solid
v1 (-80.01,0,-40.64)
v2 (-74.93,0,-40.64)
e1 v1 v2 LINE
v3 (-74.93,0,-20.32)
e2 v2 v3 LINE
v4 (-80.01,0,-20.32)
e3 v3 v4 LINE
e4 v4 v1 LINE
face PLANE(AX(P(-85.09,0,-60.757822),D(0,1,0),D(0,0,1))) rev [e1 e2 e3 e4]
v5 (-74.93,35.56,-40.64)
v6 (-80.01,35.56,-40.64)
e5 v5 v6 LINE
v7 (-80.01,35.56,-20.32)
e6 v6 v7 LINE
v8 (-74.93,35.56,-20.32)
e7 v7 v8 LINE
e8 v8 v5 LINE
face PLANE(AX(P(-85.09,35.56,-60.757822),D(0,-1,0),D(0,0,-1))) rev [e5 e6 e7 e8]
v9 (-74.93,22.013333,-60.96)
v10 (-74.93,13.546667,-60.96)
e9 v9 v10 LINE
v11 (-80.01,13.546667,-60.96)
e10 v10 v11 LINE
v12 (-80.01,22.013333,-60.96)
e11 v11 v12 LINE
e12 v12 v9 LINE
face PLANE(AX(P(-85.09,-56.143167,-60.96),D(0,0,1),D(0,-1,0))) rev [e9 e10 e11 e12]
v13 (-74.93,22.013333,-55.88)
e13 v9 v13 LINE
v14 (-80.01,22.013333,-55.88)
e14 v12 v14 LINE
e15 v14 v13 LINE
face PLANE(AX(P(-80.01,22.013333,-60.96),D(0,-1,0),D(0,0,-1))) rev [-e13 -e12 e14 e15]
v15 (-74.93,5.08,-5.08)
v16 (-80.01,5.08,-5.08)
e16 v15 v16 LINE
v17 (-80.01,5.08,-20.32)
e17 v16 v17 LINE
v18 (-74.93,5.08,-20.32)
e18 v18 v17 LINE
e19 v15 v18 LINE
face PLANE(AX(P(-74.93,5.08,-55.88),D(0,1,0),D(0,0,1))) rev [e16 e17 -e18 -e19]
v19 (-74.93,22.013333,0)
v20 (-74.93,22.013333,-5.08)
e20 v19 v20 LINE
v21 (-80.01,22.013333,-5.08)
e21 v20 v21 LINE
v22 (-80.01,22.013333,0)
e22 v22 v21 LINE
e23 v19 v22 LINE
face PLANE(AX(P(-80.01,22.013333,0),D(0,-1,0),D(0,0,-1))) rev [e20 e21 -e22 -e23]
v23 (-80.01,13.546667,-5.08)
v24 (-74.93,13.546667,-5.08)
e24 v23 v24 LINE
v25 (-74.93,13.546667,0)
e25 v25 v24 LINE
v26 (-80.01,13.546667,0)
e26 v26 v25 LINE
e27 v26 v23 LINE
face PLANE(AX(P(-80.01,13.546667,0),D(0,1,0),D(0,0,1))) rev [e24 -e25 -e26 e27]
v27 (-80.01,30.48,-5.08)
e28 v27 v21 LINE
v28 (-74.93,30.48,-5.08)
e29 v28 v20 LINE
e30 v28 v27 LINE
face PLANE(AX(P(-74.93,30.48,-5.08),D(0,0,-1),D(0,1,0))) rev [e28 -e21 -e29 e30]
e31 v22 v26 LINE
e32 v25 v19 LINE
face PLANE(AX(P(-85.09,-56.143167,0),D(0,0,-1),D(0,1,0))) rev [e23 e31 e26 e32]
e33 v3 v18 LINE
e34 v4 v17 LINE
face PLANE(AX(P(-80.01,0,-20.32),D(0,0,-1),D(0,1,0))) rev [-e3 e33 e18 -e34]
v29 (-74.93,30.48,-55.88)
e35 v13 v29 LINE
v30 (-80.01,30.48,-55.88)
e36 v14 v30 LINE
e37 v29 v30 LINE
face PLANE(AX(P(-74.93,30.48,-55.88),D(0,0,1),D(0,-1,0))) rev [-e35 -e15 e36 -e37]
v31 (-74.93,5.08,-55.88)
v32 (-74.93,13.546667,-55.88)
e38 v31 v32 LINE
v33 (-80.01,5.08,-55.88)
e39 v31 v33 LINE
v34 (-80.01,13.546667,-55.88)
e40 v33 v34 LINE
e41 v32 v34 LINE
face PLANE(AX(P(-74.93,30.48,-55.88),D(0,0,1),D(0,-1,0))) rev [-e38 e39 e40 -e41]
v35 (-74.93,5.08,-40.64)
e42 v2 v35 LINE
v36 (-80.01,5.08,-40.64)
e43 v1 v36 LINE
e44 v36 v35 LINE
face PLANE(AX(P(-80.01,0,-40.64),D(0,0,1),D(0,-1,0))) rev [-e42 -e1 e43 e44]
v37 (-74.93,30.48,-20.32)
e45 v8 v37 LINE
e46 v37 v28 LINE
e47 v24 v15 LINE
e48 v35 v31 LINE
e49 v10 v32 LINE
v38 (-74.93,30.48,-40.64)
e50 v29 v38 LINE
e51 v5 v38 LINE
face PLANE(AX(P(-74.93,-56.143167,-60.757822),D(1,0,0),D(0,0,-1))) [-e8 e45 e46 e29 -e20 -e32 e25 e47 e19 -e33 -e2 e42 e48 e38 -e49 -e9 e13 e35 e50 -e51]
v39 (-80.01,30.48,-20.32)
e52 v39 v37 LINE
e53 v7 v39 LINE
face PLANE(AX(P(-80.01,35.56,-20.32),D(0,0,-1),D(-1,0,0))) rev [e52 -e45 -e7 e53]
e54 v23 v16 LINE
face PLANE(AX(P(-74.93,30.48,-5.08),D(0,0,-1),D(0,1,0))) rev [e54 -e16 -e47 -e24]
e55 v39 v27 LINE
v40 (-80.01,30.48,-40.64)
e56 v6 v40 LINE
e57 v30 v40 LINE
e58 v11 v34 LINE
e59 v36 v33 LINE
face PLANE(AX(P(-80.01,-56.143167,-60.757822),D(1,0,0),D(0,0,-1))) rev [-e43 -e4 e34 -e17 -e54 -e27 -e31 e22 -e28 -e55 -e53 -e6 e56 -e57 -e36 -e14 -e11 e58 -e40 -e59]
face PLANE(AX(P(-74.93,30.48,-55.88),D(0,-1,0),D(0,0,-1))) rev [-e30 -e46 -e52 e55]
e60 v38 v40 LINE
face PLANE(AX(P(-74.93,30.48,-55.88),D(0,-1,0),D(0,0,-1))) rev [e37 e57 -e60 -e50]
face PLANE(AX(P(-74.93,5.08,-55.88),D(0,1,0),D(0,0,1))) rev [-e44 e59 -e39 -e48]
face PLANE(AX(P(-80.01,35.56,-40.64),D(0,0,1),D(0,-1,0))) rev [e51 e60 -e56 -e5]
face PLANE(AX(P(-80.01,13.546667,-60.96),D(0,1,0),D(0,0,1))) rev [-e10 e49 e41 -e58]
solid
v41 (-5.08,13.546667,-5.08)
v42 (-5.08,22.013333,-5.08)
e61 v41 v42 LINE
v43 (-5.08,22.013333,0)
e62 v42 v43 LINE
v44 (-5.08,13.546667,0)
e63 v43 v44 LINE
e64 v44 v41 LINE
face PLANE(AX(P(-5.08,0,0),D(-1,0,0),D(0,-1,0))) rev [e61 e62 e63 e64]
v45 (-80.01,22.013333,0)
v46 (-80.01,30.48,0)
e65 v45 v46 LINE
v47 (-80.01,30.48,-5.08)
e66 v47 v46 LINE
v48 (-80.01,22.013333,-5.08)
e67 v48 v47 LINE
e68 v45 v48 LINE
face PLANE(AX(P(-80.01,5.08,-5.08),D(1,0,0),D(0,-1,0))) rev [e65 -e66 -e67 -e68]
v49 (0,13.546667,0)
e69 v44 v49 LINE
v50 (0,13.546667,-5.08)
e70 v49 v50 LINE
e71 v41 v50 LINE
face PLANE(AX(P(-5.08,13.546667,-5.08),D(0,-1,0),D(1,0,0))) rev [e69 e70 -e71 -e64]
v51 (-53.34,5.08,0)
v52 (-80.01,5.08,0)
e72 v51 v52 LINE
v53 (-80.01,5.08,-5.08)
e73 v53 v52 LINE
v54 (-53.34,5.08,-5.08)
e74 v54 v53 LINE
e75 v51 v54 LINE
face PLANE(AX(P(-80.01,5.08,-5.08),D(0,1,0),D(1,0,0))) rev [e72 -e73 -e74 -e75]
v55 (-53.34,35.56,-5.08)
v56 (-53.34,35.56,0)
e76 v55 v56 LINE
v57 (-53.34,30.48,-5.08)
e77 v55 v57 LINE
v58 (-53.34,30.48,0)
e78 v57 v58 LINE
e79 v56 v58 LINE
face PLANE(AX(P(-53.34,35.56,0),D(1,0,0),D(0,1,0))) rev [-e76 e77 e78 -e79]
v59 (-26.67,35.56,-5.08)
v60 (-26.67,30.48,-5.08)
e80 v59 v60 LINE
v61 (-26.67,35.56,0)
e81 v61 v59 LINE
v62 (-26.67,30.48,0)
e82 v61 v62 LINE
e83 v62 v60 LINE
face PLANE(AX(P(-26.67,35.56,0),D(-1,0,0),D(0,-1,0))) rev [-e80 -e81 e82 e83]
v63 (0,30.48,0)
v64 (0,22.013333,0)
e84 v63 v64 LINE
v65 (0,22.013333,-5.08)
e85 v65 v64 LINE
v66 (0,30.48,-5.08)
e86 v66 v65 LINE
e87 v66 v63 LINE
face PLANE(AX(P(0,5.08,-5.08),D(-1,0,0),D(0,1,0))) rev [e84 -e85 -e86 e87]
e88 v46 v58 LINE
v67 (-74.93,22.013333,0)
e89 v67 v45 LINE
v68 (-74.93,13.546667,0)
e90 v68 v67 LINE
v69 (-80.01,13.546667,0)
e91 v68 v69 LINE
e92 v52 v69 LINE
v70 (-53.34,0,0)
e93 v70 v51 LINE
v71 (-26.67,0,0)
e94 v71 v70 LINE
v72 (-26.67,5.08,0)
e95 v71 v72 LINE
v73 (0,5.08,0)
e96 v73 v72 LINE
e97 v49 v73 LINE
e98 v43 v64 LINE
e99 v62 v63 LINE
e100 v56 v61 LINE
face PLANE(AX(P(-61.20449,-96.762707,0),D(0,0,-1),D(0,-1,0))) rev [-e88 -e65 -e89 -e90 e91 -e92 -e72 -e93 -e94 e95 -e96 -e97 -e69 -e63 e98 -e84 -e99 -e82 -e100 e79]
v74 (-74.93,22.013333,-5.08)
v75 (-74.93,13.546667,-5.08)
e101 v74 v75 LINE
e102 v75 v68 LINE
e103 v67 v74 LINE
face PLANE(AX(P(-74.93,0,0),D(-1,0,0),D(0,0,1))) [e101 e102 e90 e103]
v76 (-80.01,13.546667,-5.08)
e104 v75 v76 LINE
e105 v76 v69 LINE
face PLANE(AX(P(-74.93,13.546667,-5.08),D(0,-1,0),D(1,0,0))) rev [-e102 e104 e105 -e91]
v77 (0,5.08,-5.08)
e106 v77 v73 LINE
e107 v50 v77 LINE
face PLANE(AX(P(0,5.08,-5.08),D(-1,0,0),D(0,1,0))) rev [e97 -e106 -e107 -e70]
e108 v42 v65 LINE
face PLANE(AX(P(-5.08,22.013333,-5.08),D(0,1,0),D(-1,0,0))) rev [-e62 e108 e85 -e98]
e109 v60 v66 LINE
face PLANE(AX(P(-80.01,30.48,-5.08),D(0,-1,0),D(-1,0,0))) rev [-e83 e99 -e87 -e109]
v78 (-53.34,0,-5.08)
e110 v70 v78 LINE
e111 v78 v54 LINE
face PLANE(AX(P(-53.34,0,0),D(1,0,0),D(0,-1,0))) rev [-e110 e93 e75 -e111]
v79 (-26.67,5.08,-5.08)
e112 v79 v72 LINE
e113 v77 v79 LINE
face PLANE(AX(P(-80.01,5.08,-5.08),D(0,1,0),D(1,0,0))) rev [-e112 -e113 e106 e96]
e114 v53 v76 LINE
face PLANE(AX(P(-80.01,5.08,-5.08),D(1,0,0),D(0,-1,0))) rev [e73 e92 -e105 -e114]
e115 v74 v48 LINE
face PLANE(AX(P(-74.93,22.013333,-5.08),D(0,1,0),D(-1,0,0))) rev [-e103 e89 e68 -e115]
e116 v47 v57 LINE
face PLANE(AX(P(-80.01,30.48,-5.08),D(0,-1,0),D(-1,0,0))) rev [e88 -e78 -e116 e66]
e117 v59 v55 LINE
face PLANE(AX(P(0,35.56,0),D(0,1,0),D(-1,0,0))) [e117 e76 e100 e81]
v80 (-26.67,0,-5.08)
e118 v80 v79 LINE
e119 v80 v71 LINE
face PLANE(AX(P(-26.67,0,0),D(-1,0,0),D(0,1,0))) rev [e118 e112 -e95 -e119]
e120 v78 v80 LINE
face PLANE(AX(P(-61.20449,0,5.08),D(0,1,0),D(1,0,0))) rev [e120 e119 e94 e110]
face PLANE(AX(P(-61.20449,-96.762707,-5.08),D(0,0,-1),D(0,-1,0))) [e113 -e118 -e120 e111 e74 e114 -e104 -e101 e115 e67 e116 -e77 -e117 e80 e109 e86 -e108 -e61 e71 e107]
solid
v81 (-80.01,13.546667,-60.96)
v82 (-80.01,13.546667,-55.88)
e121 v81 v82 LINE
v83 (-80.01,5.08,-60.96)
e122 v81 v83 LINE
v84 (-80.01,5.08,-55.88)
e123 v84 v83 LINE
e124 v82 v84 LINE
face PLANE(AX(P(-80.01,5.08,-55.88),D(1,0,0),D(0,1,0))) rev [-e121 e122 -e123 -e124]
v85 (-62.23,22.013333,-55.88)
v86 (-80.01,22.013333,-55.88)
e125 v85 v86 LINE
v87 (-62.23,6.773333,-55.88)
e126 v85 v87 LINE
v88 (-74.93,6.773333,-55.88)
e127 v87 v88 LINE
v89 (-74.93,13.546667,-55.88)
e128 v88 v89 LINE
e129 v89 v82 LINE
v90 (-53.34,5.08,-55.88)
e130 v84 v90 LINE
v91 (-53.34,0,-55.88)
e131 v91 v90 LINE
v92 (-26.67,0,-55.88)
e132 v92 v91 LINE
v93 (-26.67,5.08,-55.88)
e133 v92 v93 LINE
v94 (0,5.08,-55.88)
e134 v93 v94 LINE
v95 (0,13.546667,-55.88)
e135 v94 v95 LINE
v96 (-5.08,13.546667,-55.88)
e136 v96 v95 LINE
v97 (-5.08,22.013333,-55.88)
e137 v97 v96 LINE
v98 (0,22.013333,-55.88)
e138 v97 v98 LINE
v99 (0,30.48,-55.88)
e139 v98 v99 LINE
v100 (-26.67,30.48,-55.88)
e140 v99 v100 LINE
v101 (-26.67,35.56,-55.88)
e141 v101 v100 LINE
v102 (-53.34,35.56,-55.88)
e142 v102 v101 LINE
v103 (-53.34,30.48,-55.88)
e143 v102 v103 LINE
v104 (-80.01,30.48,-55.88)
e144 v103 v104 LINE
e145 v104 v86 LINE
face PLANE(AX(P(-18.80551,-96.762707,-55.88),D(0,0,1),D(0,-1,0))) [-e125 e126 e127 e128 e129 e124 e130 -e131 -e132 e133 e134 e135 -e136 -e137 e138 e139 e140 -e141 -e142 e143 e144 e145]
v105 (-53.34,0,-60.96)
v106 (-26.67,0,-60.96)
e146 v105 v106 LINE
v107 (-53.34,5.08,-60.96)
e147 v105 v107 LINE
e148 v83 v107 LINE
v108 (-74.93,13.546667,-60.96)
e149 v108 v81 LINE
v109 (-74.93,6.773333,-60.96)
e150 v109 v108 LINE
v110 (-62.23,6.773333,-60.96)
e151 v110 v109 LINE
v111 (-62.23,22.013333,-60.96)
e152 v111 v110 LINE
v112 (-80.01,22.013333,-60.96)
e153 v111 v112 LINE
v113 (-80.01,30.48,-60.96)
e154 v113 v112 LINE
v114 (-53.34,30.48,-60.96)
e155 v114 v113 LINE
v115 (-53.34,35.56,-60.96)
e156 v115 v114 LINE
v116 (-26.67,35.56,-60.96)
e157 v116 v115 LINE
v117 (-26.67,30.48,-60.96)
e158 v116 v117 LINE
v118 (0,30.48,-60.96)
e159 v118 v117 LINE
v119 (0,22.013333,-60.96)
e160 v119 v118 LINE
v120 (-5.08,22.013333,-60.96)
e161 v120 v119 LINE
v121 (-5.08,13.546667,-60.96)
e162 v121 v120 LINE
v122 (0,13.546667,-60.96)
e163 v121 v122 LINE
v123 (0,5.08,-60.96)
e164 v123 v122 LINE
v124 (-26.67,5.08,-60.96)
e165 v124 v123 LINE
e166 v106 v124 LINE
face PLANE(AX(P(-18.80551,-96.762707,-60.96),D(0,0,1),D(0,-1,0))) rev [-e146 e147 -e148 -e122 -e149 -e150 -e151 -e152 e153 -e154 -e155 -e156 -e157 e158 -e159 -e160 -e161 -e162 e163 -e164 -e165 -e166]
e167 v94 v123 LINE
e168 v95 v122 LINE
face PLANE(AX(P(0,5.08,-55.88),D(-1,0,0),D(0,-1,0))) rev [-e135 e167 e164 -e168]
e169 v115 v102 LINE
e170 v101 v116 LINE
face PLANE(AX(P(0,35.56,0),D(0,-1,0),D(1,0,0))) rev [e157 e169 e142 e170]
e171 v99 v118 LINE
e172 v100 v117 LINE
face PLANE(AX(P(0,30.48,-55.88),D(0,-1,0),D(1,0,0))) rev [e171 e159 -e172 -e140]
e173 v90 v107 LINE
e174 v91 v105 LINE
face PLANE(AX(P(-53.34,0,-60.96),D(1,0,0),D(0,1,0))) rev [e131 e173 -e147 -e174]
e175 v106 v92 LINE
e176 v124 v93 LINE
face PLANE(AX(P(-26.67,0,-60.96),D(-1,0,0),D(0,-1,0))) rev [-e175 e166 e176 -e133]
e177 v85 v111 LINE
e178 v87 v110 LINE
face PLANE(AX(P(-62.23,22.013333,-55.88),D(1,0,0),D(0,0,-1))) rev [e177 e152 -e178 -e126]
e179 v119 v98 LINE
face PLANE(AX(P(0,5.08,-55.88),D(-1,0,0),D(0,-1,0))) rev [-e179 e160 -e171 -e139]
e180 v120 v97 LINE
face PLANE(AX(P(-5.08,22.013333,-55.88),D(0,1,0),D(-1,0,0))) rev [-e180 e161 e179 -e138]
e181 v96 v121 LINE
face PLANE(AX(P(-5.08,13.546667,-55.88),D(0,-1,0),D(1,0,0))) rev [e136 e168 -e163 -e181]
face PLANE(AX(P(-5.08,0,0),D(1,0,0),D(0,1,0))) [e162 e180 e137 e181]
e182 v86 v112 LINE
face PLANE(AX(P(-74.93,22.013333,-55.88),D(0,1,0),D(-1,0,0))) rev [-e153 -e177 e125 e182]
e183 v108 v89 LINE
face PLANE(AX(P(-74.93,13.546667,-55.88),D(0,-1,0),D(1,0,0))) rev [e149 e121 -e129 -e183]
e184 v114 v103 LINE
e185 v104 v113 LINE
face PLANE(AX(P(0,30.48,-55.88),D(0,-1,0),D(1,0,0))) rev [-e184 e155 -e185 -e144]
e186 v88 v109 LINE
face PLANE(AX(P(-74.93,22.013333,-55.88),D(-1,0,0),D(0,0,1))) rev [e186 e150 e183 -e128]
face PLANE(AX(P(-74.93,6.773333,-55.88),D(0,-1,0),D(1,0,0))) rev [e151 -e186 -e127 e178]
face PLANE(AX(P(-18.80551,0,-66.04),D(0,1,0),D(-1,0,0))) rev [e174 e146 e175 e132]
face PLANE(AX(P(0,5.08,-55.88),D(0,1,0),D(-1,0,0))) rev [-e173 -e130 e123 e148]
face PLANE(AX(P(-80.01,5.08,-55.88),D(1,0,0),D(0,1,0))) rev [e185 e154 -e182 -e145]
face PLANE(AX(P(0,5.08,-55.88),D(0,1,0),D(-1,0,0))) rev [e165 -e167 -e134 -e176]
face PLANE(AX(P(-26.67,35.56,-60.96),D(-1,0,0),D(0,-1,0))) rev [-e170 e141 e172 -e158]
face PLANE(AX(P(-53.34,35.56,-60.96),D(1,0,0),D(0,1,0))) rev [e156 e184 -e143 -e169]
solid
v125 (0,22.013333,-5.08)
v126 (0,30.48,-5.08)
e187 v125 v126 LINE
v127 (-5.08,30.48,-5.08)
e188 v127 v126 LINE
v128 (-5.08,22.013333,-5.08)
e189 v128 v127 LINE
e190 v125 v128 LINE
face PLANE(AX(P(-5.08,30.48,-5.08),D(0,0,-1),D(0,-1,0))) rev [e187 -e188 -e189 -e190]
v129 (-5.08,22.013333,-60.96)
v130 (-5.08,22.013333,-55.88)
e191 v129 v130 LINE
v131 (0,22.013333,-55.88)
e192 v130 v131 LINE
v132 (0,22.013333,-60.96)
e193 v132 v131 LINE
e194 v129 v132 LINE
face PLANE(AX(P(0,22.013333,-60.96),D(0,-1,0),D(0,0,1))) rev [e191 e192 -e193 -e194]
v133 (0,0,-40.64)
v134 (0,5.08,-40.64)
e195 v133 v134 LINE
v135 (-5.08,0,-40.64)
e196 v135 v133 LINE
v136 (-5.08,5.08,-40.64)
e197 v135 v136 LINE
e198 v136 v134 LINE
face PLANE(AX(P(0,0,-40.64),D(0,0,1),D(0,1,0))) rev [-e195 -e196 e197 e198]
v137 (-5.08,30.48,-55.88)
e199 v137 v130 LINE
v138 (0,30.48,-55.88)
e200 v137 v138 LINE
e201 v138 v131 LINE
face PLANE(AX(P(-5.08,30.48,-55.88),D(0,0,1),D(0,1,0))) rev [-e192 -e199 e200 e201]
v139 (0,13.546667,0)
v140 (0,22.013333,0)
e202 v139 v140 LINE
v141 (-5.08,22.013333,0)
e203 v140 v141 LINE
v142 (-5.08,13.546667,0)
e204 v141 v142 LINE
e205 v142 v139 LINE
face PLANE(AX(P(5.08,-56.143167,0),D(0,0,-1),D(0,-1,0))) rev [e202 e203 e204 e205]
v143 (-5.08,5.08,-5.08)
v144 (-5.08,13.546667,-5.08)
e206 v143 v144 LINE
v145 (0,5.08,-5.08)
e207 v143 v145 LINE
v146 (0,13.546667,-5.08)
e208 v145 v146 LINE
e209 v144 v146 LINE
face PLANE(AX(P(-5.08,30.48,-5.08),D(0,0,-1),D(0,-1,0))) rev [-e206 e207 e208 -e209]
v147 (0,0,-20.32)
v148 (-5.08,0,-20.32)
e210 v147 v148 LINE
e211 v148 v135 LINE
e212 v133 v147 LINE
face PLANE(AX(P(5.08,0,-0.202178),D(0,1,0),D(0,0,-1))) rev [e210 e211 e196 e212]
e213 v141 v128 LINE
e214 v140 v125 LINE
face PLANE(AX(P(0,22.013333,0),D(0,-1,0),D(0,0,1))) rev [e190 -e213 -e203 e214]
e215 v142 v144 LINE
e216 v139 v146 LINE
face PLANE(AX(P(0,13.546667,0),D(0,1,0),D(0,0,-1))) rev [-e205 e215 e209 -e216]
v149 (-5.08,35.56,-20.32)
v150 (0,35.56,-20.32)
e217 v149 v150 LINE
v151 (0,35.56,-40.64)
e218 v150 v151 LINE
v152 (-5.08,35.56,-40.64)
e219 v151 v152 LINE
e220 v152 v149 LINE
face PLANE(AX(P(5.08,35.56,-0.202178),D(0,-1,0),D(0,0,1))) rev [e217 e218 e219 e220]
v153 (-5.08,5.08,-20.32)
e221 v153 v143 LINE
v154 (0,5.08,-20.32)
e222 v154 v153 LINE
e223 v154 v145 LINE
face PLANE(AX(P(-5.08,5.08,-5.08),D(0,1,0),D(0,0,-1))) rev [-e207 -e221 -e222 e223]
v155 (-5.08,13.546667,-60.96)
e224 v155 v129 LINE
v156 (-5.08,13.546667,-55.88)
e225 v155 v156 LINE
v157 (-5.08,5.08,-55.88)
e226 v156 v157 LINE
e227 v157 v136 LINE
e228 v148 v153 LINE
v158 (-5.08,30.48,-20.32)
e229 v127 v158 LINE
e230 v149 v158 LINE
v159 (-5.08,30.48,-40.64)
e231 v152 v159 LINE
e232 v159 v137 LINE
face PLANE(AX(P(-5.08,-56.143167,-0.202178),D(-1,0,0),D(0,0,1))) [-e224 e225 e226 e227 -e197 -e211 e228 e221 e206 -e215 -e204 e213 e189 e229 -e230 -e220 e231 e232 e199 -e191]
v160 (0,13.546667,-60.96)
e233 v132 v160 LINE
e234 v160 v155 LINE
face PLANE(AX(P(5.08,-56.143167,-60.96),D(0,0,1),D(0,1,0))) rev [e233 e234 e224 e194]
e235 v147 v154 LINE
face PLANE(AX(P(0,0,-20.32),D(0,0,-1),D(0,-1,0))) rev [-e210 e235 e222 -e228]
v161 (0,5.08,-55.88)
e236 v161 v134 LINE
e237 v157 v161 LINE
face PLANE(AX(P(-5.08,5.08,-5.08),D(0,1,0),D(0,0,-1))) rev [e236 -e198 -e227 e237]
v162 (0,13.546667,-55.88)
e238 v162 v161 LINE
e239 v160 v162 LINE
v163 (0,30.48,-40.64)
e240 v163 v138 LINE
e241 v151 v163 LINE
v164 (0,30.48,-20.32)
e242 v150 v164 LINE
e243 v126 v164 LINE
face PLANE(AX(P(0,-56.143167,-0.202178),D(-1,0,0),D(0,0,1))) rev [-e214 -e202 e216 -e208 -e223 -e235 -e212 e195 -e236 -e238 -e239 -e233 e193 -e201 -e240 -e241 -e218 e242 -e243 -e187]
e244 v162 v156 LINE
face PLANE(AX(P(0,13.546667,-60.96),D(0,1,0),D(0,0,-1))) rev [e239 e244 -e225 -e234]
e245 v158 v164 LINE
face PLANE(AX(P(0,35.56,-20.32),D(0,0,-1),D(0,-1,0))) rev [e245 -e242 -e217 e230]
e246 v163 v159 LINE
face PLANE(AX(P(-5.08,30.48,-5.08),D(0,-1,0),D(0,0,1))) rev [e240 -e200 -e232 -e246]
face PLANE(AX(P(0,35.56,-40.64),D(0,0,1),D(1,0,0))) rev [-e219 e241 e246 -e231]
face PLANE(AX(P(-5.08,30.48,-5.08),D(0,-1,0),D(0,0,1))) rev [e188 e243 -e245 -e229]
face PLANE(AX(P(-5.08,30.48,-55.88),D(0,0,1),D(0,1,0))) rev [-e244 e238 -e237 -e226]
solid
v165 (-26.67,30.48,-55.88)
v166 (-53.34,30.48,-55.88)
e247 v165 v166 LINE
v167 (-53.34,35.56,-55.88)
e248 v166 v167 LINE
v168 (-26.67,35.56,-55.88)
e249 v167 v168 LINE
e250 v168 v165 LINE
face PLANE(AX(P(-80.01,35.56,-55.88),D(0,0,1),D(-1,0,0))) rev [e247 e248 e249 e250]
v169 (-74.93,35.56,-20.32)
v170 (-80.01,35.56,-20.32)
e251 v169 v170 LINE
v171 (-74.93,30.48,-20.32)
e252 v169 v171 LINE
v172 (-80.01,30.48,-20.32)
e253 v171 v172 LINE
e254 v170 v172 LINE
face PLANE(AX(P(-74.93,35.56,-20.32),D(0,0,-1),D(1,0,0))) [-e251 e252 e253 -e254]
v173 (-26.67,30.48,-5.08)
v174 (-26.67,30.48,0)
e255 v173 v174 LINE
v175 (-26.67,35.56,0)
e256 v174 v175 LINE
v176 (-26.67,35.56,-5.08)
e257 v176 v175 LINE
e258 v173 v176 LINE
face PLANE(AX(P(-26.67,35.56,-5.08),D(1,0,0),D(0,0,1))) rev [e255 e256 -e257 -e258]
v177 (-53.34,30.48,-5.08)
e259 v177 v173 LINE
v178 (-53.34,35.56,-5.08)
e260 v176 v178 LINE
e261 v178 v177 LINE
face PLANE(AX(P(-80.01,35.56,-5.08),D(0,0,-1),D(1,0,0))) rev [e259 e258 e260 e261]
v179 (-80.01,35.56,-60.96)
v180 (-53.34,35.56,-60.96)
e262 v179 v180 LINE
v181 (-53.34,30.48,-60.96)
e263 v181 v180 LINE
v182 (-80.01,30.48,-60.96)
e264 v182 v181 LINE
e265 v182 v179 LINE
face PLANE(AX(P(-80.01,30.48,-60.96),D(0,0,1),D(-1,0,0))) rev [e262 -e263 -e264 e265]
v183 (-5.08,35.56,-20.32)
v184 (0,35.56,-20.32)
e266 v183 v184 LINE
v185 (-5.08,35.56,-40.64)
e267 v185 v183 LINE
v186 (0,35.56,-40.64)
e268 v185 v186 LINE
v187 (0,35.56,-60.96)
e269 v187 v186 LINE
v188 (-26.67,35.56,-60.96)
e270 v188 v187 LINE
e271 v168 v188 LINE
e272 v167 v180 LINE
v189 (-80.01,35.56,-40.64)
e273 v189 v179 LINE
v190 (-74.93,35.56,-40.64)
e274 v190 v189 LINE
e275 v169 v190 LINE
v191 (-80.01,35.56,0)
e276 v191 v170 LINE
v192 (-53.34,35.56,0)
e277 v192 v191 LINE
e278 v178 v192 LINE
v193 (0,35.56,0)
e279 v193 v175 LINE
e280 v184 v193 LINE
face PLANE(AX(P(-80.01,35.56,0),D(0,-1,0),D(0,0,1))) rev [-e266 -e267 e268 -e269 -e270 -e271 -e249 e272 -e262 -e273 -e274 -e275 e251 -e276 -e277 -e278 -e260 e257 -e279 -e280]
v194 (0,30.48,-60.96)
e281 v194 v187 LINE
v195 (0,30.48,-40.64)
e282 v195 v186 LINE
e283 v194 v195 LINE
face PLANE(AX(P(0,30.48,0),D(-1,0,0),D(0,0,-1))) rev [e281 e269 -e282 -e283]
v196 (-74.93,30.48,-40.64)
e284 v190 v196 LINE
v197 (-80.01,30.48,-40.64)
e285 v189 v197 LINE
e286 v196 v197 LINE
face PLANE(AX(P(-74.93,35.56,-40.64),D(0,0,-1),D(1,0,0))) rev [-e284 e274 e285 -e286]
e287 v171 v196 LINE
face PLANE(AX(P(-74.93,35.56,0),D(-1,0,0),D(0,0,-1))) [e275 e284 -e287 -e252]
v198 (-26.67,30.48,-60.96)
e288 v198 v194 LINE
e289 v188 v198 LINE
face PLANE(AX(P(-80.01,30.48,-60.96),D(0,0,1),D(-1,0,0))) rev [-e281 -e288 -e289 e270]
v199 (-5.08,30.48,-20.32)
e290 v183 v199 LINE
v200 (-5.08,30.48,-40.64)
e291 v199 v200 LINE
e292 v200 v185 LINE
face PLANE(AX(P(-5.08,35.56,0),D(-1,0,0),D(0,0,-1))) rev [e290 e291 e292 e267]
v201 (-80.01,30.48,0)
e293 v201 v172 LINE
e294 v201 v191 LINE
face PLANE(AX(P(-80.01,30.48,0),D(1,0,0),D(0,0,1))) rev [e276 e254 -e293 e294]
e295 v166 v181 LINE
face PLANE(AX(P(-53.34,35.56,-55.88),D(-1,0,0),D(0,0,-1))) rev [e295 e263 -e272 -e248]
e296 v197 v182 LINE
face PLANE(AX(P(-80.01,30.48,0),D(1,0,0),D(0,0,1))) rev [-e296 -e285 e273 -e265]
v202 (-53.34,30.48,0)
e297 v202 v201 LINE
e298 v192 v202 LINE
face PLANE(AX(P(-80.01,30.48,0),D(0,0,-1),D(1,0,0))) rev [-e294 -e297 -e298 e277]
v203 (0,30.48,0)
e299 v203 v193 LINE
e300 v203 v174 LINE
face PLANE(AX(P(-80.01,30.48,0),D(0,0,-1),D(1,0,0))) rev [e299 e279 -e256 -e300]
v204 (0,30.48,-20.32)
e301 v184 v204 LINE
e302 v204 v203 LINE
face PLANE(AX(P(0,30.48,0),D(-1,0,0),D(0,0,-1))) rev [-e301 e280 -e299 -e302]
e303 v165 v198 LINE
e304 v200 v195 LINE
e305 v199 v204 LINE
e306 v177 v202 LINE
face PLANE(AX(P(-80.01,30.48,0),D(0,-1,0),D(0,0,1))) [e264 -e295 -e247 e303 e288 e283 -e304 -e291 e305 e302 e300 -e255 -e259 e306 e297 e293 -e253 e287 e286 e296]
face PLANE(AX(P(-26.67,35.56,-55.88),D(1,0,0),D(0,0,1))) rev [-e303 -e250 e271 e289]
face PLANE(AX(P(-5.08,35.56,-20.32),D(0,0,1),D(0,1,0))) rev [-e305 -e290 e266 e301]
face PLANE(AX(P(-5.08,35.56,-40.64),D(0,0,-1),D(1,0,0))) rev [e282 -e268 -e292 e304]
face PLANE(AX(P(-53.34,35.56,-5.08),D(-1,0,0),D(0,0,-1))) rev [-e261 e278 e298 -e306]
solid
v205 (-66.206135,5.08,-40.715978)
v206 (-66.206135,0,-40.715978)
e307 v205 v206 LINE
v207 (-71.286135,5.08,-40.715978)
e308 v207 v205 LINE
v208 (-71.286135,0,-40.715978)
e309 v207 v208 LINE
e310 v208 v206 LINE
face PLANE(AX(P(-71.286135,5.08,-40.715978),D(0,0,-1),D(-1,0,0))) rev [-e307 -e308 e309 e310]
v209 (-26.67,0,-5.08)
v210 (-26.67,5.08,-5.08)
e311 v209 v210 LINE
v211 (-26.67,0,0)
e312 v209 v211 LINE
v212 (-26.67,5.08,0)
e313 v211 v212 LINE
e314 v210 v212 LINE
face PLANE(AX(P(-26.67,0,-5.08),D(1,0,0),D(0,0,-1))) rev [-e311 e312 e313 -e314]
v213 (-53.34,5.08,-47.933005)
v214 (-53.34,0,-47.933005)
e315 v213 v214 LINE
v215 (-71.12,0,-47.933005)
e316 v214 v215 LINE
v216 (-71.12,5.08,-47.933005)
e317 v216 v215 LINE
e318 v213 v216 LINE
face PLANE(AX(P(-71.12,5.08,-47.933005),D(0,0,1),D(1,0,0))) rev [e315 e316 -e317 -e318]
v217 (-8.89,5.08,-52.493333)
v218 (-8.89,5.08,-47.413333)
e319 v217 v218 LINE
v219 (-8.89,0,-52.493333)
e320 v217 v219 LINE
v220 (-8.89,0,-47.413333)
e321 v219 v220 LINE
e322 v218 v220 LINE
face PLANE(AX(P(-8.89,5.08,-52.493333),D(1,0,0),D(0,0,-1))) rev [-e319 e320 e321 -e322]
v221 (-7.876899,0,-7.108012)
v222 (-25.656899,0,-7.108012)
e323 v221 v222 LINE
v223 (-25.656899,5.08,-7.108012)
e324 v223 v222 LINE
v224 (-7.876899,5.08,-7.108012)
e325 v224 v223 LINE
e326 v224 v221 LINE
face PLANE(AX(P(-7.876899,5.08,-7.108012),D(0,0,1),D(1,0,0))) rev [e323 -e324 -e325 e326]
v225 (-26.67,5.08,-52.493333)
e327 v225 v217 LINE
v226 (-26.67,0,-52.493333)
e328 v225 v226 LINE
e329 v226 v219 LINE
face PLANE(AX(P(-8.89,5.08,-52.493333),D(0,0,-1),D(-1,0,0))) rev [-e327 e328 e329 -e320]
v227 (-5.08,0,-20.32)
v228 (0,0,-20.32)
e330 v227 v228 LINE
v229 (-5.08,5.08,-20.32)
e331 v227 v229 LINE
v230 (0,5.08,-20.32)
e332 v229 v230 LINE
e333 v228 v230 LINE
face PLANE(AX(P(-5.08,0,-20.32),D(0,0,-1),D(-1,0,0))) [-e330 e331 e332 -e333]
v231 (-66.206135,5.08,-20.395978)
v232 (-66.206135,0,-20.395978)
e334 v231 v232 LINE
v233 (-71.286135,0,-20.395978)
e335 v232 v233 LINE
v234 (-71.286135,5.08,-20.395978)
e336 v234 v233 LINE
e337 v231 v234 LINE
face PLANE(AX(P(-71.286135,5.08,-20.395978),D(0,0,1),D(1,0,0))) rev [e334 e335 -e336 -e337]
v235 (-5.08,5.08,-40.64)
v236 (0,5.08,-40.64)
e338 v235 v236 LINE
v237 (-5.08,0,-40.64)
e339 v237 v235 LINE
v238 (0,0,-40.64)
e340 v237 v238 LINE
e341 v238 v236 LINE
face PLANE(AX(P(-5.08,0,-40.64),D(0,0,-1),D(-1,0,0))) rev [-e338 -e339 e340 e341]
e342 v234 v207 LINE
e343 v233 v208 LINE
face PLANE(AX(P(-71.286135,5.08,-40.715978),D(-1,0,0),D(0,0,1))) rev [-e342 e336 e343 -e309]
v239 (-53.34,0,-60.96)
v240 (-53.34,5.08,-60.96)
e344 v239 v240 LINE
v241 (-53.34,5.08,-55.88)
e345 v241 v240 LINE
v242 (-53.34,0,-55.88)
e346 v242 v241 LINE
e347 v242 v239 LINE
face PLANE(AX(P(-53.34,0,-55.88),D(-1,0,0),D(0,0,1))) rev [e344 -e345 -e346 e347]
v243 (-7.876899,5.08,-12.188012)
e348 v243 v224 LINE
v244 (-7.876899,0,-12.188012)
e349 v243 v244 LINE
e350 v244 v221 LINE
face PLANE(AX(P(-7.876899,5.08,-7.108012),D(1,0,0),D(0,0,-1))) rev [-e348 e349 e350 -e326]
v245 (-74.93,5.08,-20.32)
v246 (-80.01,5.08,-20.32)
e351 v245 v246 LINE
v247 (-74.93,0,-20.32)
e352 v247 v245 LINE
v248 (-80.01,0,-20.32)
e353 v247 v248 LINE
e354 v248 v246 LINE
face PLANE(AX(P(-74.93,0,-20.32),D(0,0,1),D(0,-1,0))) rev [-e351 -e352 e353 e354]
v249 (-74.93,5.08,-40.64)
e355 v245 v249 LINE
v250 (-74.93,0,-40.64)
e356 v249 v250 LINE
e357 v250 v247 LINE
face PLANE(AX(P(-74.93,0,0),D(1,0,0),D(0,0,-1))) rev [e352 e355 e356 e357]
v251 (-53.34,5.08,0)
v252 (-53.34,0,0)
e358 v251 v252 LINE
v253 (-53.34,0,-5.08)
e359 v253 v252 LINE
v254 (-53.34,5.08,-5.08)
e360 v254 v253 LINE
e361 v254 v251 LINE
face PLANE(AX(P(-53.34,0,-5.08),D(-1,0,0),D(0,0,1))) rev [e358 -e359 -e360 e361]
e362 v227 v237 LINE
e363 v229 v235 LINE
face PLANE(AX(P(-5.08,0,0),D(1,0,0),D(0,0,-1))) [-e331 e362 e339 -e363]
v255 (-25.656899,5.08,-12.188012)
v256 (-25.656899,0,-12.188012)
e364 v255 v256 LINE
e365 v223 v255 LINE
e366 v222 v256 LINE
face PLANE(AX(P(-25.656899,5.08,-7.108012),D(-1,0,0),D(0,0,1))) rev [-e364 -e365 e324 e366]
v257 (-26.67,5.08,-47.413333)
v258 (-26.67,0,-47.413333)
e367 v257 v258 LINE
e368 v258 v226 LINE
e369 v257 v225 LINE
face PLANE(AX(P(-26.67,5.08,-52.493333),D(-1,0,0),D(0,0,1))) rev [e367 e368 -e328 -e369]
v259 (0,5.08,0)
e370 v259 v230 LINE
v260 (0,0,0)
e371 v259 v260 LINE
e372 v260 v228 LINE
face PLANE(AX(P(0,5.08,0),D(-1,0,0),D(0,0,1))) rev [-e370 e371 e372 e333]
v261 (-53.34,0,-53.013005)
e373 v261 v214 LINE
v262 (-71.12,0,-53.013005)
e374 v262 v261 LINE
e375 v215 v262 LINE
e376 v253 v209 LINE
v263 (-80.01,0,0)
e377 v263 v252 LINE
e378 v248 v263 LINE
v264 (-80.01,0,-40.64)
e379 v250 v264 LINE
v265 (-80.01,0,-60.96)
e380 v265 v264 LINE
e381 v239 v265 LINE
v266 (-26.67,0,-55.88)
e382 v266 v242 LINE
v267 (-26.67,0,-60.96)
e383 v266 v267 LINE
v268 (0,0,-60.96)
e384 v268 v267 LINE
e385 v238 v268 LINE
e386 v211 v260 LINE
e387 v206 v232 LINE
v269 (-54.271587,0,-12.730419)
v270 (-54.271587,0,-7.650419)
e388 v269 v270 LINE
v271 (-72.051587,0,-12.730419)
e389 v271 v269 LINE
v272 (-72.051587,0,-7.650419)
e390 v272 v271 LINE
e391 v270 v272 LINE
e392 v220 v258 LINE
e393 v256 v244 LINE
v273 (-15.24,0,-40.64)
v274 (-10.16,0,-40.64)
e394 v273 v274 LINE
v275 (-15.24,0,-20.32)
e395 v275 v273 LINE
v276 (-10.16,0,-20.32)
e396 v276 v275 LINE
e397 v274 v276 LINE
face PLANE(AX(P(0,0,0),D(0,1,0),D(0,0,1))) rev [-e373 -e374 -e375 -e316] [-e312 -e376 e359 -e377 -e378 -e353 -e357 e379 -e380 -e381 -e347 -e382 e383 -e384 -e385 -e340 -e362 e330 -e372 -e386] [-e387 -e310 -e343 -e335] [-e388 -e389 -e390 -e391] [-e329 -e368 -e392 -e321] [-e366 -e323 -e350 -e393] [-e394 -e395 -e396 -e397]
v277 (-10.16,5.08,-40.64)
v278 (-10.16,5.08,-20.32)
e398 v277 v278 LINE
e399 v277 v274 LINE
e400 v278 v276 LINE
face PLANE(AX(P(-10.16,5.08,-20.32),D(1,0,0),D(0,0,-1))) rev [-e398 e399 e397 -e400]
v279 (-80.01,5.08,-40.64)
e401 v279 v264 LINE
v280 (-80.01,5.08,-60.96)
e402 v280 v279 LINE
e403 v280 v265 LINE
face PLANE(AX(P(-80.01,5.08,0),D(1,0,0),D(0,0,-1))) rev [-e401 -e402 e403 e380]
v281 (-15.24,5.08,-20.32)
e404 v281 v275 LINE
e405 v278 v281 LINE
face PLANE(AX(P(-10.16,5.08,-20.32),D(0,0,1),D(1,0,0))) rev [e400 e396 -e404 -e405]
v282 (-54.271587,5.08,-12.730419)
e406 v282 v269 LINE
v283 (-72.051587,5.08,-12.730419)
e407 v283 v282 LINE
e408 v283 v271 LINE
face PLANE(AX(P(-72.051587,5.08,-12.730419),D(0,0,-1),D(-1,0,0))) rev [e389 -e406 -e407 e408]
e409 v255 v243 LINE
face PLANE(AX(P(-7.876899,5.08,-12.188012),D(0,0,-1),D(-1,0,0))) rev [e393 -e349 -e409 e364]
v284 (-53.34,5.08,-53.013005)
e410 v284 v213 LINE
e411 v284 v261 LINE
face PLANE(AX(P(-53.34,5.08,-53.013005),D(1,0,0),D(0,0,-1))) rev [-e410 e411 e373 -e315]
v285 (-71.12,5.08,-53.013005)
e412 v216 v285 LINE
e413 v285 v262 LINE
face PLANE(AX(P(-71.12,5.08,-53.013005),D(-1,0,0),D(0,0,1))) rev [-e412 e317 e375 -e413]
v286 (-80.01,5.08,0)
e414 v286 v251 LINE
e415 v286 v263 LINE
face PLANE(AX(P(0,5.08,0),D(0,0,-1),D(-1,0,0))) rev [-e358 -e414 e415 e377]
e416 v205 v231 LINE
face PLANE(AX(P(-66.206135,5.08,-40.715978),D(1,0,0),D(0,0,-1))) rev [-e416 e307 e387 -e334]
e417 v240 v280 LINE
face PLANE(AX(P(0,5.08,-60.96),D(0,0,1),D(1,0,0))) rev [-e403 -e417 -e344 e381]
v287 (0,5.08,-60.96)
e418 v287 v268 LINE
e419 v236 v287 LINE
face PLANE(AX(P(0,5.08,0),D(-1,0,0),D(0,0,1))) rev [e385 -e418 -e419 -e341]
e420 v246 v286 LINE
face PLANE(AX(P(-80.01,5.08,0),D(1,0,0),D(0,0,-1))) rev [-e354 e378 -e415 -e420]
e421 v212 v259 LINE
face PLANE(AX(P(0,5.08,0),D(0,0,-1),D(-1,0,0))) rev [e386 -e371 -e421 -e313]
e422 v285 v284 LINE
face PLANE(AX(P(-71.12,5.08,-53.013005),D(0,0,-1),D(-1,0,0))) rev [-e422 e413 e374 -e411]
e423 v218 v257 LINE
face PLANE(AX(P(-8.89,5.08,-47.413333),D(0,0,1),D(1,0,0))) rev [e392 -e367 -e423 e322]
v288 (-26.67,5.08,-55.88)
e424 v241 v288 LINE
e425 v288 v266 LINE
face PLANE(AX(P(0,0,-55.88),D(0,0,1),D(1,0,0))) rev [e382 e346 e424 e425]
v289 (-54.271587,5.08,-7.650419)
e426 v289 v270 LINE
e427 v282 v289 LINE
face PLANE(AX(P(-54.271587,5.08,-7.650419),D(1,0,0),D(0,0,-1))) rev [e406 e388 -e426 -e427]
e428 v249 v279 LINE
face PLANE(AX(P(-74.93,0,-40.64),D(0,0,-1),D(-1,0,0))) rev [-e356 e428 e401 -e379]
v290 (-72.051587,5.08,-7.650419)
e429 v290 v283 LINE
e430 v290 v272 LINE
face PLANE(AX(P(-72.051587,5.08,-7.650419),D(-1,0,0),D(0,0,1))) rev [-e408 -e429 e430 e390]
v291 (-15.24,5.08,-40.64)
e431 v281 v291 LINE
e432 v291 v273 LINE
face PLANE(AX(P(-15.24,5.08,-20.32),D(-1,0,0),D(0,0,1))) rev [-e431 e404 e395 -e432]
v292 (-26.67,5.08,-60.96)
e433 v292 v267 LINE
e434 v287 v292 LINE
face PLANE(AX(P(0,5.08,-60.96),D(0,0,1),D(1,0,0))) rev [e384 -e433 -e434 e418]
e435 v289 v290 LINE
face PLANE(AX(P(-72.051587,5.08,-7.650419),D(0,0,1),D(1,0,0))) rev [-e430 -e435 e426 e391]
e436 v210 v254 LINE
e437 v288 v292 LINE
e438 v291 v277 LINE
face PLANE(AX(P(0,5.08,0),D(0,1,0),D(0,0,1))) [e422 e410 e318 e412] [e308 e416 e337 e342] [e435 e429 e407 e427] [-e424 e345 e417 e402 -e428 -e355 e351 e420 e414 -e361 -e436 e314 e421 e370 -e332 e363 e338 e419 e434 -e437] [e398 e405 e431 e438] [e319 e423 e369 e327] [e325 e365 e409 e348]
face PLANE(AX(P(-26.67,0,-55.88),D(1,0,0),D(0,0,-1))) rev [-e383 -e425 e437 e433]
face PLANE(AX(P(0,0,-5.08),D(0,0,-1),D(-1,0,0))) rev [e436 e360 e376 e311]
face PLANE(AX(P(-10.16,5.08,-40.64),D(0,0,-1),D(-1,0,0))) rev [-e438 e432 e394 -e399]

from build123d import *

# Parameters (mm, degrees)
SKETCH1_W             = 80.01
SKETCH1_H             = 60.96
BOSS_EXTRUDE2_DEPTH   = 5.08
SKETCH2_W             = 20.32
SKETCH2_H             = 5.08
CUT_EXTRUDE1_DEPTH    = 5.08
SKETCH3_W             = 20.32
SKETCH3_H             = 5.08
CUT_EXTRUDE2_DEPTH    = 5.08
SKETCH4_W             = 26.67
SKETCH4_H             = 5.08
CUT_EXTRUDE3_DEPTH    = 5.08
SKETCH5_W             = 26.67
SKETCH5_H             = 5.08
CUT_EXTRUDE4_DEPTH    = 5.08
SKETCH6_W             = 80.01
SKETCH6_H             = 25.4
BOSS_EXTRUDE3_DEPTH   = 5.08
SKETCH7_W             = 26.67
SKETCH7_H             = 5.08
BOSS_EXTRUDE4_DEPTH   = 5.08
BODY_MOVE_COPY1_ANGLE = 90
CIRPATTERN1_COUNT     = 2
SKETCH8_W             = 5.08
SKETCH8_H             = 8.466666666
CUT_EXTRUDE5_DEPTH    = 5.08
SKETCH10_W            = 5.08
SKETCH10_H            = 8.466666666
CUT_EXTRUDE7_DEPTH    = 5.08
SKETCH17_W            = 12.7
SKETCH17_H            = 15.24
CUT_EXTRUDE8_DEPTH    = 5.08
SKETCH18_W            = 26.67
SKETCH18_H            = 5.08
BOSS_EXTRUDE11_DEPTH  = 5.08
CIRPATTERN4_COUNT     = 2
SKETCH19_W            = 25.4
SKETCH19_H            = 50.8
BOSS_EXTRUDE12_DEPTH  = 5.08
SKETCH20_W            = 8.466666666
SKETCH20_H            = 5.08
BOSS_EXTRUDE13_DEPTH  = 5.08
SKETCH21_W            = 8.466666666
SKETCH21_H            = 5.08
BOSS_EXTRUDE14_DEPTH  = 5.08
SKETCH22_W            = 20.32
SKETCH22_H            = 5.08
BOSS_EXTRUDE15_DEPTH  = 5.08
SKETCH23_W            = 20.32
SKETCH23_H            = 5.08
BOSS_EXTRUDE16_DEPTH  = 5.08
BODY_MOVE_COPY4_ANGLE = 90
CIRPATTERN5_ANGLE     = 180
SKETCH24_W            = 17.78
SKETCH24_H            = 5.08
CUT_EXTRUDE9_DEPTH    = 5.08
CIRPATTERN6_COUNT     = 2
SKETCH25_W            = 17.78
SKETCH25_H            = 5.08
CUT_EXTRUDE10_DEPTH   = 5.08
CIRPATTERN7_COUNT     = 2
SKETCH28_W            = 5.08
SKETCH28_H            = 20.32
CUT_EXTRUDE11_DEPTH   = 5.08
CIRPATTERN8_COUNT     = 2


with BuildPart() as part:
    # Sketch1 → Boss-Extrude2 (new body)
    with BuildSketch(Plane(origin=(0, 0, 0), x_dir=(1, 0, 0), z_dir=(0, 1, 0))):
        with Locations((-40.005, 30.48)):
            Rectangle(SKETCH1_W, SKETCH1_H)
    extrude(amount=BOSS_EXTRUDE2_DEPTH)

    # Sketch2 → Cut-Extrude1 (cut)
    with BuildSketch(Plane(origin=(0, 0, 0), x_dir=(0, 0, -1), z_dir=(1, 0, 0))):
        with Locations((30.48, 2.54)):
            Rectangle(SKETCH2_W, SKETCH2_H)
    extrude(amount=-CUT_EXTRUDE1_DEPTH, mode=Mode.SUBTRACT)

    # Sketch3 → Cut-Extrude2 (cut)
    with BuildSketch(Plane.ZY.offset(80.01)):
        with Locations((-30.48, 2.54)):
            Rectangle(SKETCH3_W, SKETCH3_H)
    extrude(amount=-CUT_EXTRUDE2_DEPTH, mode=Mode.SUBTRACT)

    # Sketch4 → Cut-Extrude3 (cut)
    with BuildSketch(Plane.XY):
        with Locations((-40.005, 2.54)):
            Rectangle(SKETCH4_W, SKETCH4_H)
    extrude(amount=-CUT_EXTRUDE3_DEPTH, mode=Mode.SUBTRACT)

    # Sketch5 → Cut-Extrude4 (cut)
    with BuildSketch(Plane(origin=(0, 0, -60.96), x_dir=(-1, 0, 0), z_dir=(0, 0, -1))):
        with Locations((40.005, 2.54)):
            Rectangle(SKETCH5_W, SKETCH5_H)
    extrude(amount=-CUT_EXTRUDE4_DEPTH, mode=Mode.SUBTRACT)


with BuildPart() as body_2:
    # Sketch6 → Boss-Extrude3 (new body)
    with BuildSketch(Plane(origin=(0, 5.08, 0), x_dir=(1, 0, 0), z_dir=(0, 1, 0))):
        with Locations((-21.199489538, 114.542707296)):
            Rectangle(SKETCH6_W, SKETCH6_H)
    extrude(amount=BOSS_EXTRUDE3_DEPTH)

    # Sketch7 → Boss-Extrude4 (add)
    with BuildSketch(Plane.XY.offset(-101.842707296)):
        with Locations((-21.199489538, 7.62)):
            Rectangle(SKETCH7_W, SKETCH7_H)
    extrude(amount=BOSS_EXTRUDE4_DEPTH)


with BuildPart() as body_2_1:
    # Body-Move/Copy1: read off the stored shape, not the designer's step
    # Body-Move/Copy1: moved
    add(body_2.part.moved(Location((-18.8055105, -66.04, 96.7627073))).rotate(Axis((0, 0, 0), (1, 0, 0)), BODY_MOVE_COPY1_ANGLE))


with BuildPart() as cirpattern1_1:
    # CirPattern1: pattern copy
    add(body_2_1.part.rotate(Axis((-40.005, 0, -30.48), (0, 1, 0)), 1 * 360 / CIRPATTERN1_COUNT))


with BuildPart() as cut_extrude5_tool:
    # Sketch8 → Cut-Extrude5 (new body)
    with BuildSketch(Plane(origin=(0, 0, 0), x_dir=(0, 0, -1), z_dir=(1, 0, 0))):
        with Locations((2.54, 17.78)):
            Rectangle(SKETCH8_W, SKETCH8_H)
        with Locations((58.42, 17.78)):
            Rectangle(SKETCH8_W, SKETCH8_H)
    extrude(amount=-CUT_EXTRUDE5_DEPTH)


with BuildPart() as body_2_2:
    add(body_2_1.part)

    # Cut-Extrude5: cut by cut_extrude5_tool
    add(cut_extrude5_tool.part, mode=Mode.SUBTRACT)


with BuildPart() as cirpattern1_1_1:
    add(cirpattern1_1.part)

    # Cut-Extrude5: cut by cut_extrude5_tool
    add(cut_extrude5_tool.part, mode=Mode.SUBTRACT)


with BuildPart() as cut_extrude7_tool:
    # Sketch10 → Cut-Extrude7 (new body)
    with BuildSketch(Plane.ZY.offset(80.01)):
        with Locations((-58.42, 17.78)):
            Rectangle(SKETCH10_W, SKETCH10_H)
        with Locations((-2.54, 17.78)):
            Rectangle(SKETCH10_W, SKETCH10_H)
    extrude(amount=-CUT_EXTRUDE7_DEPTH)


with BuildPart() as body_2_3:
    add(body_2_2.part)

    # Cut-Extrude7: cut by cut_extrude7_tool
    add(cut_extrude7_tool.part, mode=Mode.SUBTRACT)

    # Sketch17 → Cut-Extrude8 (cut)
    with BuildSketch(Plane(origin=(0, 0, -60.96), x_dir=(-1, 0, 0), z_dir=(0, 0, -1))):
        with Locations((68.58, 14.393333333)):
            Rectangle(SKETCH17_W, SKETCH17_H)
    extrude(amount=-CUT_EXTRUDE8_DEPTH, mode=Mode.SUBTRACT)



with BuildPart() as cirpattern1_1_2:
    add(cirpattern1_1_1.part)

    # Cut-Extrude7: cut by cut_extrude7_tool
    add(cut_extrude7_tool.part, mode=Mode.SUBTRACT)


with BuildPart() as body_2_4:
    add(body_2_3.part)

    add(cirpattern1_1_2.part)  # Boss-Extrude11 merges CirPattern1_1
    # Sketch18 → Boss-Extrude11 (add)
    with BuildSketch(Plane(origin=(0, 30.48, 0), x_dir=(1, 0, 0), z_dir=(0, 1, 0))):
        with Locations((-40.005, 2.54)):
            Rectangle(SKETCH18_W, SKETCH18_H)
        with Locations((-40.005, 58.42)):
            Rectangle(SKETCH18_W, SKETCH18_H)
    extrude(amount=BOSS_EXTRUDE11_DEPTH)


with BuildPart() as cirpattern4_1:
    # CirPattern4: pattern copy
    add(part.part.rotate(Axis((-40.005, 17.78, 0), (0, 0, 1)), 1 * 360 / CIRPATTERN4_COUNT))


with BuildPart() as body_4:
    # Sketch19 → Boss-Extrude12 (new body)
    with BuildSketch(Plane(origin=(0, 5.08, 0), x_dir=(1, 0, 0), z_dir=(0, 1, 0))):
        with Locations((73.923166649, 30.277821877)):
            Rectangle(SKETCH19_W, SKETCH19_H)
    extrude(amount=BOSS_EXTRUDE12_DEPTH)

    # Sketch20 → Boss-Extrude13 (add)
    with BuildSketch(Plane(origin=(0, 0, -55.677821877), x_dir=(-1, 0, 0), z_dir=(0, 0, -1))):
        with Locations((-73.923166649, 7.62)):
            Rectangle(SKETCH20_W, SKETCH20_H)
    extrude(amount=BOSS_EXTRUDE13_DEPTH)

    # Sketch21 → Boss-Extrude14 (add)
    with BuildSketch(Plane.XY.offset(-4.877821877)):
        with Locations((73.923166649, 7.62)):
            Rectangle(SKETCH21_W, SKETCH21_H)
    extrude(amount=BOSS_EXTRUDE14_DEPTH)

    # Sketch22 → Boss-Extrude15 (add)
    with BuildSketch(Plane(origin=(86.623166649, 0, 0), x_dir=(0, 0, -1), z_dir=(1, 0, 0))):
        with Locations((30.277821877, 7.62)):
            Rectangle(SKETCH22_W, SKETCH22_H)
    extrude(amount=BOSS_EXTRUDE15_DEPTH)

    # Sketch23 → Boss-Extrude16 (add)
    with BuildSketch(Plane.ZY.offset(-61.223166649)):
        with Locations((-30.277821877, 7.62)):
            Rectangle(SKETCH23_W, SKETCH23_H)
    extrude(amount=BOSS_EXTRUDE16_DEPTH)


with BuildPart() as body_4_1:
    # Body-Move/Copy4: read off the stored shape, not the designer's step
    # Body-Move/Copy4: moved
    add(body_4.part.moved(Location((-56.1431666, -5.08, -0.2021781))).rotate(Axis((0, 0, 0), (0, 0, 1)), BODY_MOVE_COPY4_ANGLE))


with BuildPart() as body_5:
    # CirPattern5: read off the stored shape, not the designer's step
    # CirPattern5: copy of body 4
    add(body_4_1.part.moved(Location((80.01, 0, 60.96))).rotate(Axis((0, 0, 0), (0, 1, 0)), CIRPATTERN5_ANGLE))


with BuildPart() as part_1:
    add(part.part)

    # Sketch24 → Cut-Extrude9 (cut)
    with BuildSketch(Plane(origin=(0, 0, 0), x_dir=(-1, 0, 0), z_dir=(0, -1, 0))):
        with Locations((17.78, 49.953333333)):
            Rectangle(SKETCH24_W, SKETCH24_H)
    cut_extrude9 = extrude(amount=-CUT_EXTRUDE9_DEPTH, mode=Mode.SUBTRACT)

    # CirPattern6: Cut-Extrude9 ×2 about axis
    cirpattern6_axis = Axis((-40.470793413, 0, -30.071876248), (0, 1, 0))
    for i in range(1, CIRPATTERN6_COUNT):
        add(cut_extrude9.rotate(cirpattern6_axis, i * 360 / CIRPATTERN6_COUNT), mode=Mode.SUBTRACT)

    # Sketch25 → Cut-Extrude10 (cut)
    with BuildSketch(Plane(origin=(0, 0, 0), x_dir=(-1, 0, 0), z_dir=(0, -1, 0))):
        with Locations((62.23, 50.473004536)):
            Rectangle(SKETCH25_W, SKETCH25_H)
    cut_extrude10 = extrude(amount=-CUT_EXTRUDE10_DEPTH, mode=Mode.SUBTRACT)

    # CirPattern7: Cut-Extrude10 ×2 about axis
    cirpattern7_axis = Axis((-39.498449663, 0, -30.06050844), (0, 1, 0))
    for i in range(1, CIRPATTERN7_COUNT):
        add(cut_extrude10.rotate(cirpattern7_axis, i * 360 / CIRPATTERN7_COUNT), mode=Mode.SUBTRACT)

    # Sketch28 → Cut-Extrude11 (cut)
    with BuildSketch(Plane(origin=(0, 0, 0), x_dir=(-1, 0, 0), z_dir=(0, -1, 0))):
        with Locations((12.7, 30.48)):
            Rectangle(SKETCH28_W, SKETCH28_H)
    cut_extrude11 = extrude(amount=-CUT_EXTRUDE11_DEPTH, mode=Mode.SUBTRACT)

    # CirPattern8: Cut-Extrude11 ×2 about axis
    cirpattern8_axis = Axis((-40.723067531, 0, -30.5179889), (0, 1, 0))
    for i in range(1, CIRPATTERN8_COUNT):
        add(cut_extrude11.rotate(cirpattern8_axis, i * 360 / CIRPATTERN8_COUNT), mode=Mode.SUBTRACT)


solid = Compound([body_2_4.part, cirpattern4_1.part, body_4_1.part, body_5.part, part_1.part])
